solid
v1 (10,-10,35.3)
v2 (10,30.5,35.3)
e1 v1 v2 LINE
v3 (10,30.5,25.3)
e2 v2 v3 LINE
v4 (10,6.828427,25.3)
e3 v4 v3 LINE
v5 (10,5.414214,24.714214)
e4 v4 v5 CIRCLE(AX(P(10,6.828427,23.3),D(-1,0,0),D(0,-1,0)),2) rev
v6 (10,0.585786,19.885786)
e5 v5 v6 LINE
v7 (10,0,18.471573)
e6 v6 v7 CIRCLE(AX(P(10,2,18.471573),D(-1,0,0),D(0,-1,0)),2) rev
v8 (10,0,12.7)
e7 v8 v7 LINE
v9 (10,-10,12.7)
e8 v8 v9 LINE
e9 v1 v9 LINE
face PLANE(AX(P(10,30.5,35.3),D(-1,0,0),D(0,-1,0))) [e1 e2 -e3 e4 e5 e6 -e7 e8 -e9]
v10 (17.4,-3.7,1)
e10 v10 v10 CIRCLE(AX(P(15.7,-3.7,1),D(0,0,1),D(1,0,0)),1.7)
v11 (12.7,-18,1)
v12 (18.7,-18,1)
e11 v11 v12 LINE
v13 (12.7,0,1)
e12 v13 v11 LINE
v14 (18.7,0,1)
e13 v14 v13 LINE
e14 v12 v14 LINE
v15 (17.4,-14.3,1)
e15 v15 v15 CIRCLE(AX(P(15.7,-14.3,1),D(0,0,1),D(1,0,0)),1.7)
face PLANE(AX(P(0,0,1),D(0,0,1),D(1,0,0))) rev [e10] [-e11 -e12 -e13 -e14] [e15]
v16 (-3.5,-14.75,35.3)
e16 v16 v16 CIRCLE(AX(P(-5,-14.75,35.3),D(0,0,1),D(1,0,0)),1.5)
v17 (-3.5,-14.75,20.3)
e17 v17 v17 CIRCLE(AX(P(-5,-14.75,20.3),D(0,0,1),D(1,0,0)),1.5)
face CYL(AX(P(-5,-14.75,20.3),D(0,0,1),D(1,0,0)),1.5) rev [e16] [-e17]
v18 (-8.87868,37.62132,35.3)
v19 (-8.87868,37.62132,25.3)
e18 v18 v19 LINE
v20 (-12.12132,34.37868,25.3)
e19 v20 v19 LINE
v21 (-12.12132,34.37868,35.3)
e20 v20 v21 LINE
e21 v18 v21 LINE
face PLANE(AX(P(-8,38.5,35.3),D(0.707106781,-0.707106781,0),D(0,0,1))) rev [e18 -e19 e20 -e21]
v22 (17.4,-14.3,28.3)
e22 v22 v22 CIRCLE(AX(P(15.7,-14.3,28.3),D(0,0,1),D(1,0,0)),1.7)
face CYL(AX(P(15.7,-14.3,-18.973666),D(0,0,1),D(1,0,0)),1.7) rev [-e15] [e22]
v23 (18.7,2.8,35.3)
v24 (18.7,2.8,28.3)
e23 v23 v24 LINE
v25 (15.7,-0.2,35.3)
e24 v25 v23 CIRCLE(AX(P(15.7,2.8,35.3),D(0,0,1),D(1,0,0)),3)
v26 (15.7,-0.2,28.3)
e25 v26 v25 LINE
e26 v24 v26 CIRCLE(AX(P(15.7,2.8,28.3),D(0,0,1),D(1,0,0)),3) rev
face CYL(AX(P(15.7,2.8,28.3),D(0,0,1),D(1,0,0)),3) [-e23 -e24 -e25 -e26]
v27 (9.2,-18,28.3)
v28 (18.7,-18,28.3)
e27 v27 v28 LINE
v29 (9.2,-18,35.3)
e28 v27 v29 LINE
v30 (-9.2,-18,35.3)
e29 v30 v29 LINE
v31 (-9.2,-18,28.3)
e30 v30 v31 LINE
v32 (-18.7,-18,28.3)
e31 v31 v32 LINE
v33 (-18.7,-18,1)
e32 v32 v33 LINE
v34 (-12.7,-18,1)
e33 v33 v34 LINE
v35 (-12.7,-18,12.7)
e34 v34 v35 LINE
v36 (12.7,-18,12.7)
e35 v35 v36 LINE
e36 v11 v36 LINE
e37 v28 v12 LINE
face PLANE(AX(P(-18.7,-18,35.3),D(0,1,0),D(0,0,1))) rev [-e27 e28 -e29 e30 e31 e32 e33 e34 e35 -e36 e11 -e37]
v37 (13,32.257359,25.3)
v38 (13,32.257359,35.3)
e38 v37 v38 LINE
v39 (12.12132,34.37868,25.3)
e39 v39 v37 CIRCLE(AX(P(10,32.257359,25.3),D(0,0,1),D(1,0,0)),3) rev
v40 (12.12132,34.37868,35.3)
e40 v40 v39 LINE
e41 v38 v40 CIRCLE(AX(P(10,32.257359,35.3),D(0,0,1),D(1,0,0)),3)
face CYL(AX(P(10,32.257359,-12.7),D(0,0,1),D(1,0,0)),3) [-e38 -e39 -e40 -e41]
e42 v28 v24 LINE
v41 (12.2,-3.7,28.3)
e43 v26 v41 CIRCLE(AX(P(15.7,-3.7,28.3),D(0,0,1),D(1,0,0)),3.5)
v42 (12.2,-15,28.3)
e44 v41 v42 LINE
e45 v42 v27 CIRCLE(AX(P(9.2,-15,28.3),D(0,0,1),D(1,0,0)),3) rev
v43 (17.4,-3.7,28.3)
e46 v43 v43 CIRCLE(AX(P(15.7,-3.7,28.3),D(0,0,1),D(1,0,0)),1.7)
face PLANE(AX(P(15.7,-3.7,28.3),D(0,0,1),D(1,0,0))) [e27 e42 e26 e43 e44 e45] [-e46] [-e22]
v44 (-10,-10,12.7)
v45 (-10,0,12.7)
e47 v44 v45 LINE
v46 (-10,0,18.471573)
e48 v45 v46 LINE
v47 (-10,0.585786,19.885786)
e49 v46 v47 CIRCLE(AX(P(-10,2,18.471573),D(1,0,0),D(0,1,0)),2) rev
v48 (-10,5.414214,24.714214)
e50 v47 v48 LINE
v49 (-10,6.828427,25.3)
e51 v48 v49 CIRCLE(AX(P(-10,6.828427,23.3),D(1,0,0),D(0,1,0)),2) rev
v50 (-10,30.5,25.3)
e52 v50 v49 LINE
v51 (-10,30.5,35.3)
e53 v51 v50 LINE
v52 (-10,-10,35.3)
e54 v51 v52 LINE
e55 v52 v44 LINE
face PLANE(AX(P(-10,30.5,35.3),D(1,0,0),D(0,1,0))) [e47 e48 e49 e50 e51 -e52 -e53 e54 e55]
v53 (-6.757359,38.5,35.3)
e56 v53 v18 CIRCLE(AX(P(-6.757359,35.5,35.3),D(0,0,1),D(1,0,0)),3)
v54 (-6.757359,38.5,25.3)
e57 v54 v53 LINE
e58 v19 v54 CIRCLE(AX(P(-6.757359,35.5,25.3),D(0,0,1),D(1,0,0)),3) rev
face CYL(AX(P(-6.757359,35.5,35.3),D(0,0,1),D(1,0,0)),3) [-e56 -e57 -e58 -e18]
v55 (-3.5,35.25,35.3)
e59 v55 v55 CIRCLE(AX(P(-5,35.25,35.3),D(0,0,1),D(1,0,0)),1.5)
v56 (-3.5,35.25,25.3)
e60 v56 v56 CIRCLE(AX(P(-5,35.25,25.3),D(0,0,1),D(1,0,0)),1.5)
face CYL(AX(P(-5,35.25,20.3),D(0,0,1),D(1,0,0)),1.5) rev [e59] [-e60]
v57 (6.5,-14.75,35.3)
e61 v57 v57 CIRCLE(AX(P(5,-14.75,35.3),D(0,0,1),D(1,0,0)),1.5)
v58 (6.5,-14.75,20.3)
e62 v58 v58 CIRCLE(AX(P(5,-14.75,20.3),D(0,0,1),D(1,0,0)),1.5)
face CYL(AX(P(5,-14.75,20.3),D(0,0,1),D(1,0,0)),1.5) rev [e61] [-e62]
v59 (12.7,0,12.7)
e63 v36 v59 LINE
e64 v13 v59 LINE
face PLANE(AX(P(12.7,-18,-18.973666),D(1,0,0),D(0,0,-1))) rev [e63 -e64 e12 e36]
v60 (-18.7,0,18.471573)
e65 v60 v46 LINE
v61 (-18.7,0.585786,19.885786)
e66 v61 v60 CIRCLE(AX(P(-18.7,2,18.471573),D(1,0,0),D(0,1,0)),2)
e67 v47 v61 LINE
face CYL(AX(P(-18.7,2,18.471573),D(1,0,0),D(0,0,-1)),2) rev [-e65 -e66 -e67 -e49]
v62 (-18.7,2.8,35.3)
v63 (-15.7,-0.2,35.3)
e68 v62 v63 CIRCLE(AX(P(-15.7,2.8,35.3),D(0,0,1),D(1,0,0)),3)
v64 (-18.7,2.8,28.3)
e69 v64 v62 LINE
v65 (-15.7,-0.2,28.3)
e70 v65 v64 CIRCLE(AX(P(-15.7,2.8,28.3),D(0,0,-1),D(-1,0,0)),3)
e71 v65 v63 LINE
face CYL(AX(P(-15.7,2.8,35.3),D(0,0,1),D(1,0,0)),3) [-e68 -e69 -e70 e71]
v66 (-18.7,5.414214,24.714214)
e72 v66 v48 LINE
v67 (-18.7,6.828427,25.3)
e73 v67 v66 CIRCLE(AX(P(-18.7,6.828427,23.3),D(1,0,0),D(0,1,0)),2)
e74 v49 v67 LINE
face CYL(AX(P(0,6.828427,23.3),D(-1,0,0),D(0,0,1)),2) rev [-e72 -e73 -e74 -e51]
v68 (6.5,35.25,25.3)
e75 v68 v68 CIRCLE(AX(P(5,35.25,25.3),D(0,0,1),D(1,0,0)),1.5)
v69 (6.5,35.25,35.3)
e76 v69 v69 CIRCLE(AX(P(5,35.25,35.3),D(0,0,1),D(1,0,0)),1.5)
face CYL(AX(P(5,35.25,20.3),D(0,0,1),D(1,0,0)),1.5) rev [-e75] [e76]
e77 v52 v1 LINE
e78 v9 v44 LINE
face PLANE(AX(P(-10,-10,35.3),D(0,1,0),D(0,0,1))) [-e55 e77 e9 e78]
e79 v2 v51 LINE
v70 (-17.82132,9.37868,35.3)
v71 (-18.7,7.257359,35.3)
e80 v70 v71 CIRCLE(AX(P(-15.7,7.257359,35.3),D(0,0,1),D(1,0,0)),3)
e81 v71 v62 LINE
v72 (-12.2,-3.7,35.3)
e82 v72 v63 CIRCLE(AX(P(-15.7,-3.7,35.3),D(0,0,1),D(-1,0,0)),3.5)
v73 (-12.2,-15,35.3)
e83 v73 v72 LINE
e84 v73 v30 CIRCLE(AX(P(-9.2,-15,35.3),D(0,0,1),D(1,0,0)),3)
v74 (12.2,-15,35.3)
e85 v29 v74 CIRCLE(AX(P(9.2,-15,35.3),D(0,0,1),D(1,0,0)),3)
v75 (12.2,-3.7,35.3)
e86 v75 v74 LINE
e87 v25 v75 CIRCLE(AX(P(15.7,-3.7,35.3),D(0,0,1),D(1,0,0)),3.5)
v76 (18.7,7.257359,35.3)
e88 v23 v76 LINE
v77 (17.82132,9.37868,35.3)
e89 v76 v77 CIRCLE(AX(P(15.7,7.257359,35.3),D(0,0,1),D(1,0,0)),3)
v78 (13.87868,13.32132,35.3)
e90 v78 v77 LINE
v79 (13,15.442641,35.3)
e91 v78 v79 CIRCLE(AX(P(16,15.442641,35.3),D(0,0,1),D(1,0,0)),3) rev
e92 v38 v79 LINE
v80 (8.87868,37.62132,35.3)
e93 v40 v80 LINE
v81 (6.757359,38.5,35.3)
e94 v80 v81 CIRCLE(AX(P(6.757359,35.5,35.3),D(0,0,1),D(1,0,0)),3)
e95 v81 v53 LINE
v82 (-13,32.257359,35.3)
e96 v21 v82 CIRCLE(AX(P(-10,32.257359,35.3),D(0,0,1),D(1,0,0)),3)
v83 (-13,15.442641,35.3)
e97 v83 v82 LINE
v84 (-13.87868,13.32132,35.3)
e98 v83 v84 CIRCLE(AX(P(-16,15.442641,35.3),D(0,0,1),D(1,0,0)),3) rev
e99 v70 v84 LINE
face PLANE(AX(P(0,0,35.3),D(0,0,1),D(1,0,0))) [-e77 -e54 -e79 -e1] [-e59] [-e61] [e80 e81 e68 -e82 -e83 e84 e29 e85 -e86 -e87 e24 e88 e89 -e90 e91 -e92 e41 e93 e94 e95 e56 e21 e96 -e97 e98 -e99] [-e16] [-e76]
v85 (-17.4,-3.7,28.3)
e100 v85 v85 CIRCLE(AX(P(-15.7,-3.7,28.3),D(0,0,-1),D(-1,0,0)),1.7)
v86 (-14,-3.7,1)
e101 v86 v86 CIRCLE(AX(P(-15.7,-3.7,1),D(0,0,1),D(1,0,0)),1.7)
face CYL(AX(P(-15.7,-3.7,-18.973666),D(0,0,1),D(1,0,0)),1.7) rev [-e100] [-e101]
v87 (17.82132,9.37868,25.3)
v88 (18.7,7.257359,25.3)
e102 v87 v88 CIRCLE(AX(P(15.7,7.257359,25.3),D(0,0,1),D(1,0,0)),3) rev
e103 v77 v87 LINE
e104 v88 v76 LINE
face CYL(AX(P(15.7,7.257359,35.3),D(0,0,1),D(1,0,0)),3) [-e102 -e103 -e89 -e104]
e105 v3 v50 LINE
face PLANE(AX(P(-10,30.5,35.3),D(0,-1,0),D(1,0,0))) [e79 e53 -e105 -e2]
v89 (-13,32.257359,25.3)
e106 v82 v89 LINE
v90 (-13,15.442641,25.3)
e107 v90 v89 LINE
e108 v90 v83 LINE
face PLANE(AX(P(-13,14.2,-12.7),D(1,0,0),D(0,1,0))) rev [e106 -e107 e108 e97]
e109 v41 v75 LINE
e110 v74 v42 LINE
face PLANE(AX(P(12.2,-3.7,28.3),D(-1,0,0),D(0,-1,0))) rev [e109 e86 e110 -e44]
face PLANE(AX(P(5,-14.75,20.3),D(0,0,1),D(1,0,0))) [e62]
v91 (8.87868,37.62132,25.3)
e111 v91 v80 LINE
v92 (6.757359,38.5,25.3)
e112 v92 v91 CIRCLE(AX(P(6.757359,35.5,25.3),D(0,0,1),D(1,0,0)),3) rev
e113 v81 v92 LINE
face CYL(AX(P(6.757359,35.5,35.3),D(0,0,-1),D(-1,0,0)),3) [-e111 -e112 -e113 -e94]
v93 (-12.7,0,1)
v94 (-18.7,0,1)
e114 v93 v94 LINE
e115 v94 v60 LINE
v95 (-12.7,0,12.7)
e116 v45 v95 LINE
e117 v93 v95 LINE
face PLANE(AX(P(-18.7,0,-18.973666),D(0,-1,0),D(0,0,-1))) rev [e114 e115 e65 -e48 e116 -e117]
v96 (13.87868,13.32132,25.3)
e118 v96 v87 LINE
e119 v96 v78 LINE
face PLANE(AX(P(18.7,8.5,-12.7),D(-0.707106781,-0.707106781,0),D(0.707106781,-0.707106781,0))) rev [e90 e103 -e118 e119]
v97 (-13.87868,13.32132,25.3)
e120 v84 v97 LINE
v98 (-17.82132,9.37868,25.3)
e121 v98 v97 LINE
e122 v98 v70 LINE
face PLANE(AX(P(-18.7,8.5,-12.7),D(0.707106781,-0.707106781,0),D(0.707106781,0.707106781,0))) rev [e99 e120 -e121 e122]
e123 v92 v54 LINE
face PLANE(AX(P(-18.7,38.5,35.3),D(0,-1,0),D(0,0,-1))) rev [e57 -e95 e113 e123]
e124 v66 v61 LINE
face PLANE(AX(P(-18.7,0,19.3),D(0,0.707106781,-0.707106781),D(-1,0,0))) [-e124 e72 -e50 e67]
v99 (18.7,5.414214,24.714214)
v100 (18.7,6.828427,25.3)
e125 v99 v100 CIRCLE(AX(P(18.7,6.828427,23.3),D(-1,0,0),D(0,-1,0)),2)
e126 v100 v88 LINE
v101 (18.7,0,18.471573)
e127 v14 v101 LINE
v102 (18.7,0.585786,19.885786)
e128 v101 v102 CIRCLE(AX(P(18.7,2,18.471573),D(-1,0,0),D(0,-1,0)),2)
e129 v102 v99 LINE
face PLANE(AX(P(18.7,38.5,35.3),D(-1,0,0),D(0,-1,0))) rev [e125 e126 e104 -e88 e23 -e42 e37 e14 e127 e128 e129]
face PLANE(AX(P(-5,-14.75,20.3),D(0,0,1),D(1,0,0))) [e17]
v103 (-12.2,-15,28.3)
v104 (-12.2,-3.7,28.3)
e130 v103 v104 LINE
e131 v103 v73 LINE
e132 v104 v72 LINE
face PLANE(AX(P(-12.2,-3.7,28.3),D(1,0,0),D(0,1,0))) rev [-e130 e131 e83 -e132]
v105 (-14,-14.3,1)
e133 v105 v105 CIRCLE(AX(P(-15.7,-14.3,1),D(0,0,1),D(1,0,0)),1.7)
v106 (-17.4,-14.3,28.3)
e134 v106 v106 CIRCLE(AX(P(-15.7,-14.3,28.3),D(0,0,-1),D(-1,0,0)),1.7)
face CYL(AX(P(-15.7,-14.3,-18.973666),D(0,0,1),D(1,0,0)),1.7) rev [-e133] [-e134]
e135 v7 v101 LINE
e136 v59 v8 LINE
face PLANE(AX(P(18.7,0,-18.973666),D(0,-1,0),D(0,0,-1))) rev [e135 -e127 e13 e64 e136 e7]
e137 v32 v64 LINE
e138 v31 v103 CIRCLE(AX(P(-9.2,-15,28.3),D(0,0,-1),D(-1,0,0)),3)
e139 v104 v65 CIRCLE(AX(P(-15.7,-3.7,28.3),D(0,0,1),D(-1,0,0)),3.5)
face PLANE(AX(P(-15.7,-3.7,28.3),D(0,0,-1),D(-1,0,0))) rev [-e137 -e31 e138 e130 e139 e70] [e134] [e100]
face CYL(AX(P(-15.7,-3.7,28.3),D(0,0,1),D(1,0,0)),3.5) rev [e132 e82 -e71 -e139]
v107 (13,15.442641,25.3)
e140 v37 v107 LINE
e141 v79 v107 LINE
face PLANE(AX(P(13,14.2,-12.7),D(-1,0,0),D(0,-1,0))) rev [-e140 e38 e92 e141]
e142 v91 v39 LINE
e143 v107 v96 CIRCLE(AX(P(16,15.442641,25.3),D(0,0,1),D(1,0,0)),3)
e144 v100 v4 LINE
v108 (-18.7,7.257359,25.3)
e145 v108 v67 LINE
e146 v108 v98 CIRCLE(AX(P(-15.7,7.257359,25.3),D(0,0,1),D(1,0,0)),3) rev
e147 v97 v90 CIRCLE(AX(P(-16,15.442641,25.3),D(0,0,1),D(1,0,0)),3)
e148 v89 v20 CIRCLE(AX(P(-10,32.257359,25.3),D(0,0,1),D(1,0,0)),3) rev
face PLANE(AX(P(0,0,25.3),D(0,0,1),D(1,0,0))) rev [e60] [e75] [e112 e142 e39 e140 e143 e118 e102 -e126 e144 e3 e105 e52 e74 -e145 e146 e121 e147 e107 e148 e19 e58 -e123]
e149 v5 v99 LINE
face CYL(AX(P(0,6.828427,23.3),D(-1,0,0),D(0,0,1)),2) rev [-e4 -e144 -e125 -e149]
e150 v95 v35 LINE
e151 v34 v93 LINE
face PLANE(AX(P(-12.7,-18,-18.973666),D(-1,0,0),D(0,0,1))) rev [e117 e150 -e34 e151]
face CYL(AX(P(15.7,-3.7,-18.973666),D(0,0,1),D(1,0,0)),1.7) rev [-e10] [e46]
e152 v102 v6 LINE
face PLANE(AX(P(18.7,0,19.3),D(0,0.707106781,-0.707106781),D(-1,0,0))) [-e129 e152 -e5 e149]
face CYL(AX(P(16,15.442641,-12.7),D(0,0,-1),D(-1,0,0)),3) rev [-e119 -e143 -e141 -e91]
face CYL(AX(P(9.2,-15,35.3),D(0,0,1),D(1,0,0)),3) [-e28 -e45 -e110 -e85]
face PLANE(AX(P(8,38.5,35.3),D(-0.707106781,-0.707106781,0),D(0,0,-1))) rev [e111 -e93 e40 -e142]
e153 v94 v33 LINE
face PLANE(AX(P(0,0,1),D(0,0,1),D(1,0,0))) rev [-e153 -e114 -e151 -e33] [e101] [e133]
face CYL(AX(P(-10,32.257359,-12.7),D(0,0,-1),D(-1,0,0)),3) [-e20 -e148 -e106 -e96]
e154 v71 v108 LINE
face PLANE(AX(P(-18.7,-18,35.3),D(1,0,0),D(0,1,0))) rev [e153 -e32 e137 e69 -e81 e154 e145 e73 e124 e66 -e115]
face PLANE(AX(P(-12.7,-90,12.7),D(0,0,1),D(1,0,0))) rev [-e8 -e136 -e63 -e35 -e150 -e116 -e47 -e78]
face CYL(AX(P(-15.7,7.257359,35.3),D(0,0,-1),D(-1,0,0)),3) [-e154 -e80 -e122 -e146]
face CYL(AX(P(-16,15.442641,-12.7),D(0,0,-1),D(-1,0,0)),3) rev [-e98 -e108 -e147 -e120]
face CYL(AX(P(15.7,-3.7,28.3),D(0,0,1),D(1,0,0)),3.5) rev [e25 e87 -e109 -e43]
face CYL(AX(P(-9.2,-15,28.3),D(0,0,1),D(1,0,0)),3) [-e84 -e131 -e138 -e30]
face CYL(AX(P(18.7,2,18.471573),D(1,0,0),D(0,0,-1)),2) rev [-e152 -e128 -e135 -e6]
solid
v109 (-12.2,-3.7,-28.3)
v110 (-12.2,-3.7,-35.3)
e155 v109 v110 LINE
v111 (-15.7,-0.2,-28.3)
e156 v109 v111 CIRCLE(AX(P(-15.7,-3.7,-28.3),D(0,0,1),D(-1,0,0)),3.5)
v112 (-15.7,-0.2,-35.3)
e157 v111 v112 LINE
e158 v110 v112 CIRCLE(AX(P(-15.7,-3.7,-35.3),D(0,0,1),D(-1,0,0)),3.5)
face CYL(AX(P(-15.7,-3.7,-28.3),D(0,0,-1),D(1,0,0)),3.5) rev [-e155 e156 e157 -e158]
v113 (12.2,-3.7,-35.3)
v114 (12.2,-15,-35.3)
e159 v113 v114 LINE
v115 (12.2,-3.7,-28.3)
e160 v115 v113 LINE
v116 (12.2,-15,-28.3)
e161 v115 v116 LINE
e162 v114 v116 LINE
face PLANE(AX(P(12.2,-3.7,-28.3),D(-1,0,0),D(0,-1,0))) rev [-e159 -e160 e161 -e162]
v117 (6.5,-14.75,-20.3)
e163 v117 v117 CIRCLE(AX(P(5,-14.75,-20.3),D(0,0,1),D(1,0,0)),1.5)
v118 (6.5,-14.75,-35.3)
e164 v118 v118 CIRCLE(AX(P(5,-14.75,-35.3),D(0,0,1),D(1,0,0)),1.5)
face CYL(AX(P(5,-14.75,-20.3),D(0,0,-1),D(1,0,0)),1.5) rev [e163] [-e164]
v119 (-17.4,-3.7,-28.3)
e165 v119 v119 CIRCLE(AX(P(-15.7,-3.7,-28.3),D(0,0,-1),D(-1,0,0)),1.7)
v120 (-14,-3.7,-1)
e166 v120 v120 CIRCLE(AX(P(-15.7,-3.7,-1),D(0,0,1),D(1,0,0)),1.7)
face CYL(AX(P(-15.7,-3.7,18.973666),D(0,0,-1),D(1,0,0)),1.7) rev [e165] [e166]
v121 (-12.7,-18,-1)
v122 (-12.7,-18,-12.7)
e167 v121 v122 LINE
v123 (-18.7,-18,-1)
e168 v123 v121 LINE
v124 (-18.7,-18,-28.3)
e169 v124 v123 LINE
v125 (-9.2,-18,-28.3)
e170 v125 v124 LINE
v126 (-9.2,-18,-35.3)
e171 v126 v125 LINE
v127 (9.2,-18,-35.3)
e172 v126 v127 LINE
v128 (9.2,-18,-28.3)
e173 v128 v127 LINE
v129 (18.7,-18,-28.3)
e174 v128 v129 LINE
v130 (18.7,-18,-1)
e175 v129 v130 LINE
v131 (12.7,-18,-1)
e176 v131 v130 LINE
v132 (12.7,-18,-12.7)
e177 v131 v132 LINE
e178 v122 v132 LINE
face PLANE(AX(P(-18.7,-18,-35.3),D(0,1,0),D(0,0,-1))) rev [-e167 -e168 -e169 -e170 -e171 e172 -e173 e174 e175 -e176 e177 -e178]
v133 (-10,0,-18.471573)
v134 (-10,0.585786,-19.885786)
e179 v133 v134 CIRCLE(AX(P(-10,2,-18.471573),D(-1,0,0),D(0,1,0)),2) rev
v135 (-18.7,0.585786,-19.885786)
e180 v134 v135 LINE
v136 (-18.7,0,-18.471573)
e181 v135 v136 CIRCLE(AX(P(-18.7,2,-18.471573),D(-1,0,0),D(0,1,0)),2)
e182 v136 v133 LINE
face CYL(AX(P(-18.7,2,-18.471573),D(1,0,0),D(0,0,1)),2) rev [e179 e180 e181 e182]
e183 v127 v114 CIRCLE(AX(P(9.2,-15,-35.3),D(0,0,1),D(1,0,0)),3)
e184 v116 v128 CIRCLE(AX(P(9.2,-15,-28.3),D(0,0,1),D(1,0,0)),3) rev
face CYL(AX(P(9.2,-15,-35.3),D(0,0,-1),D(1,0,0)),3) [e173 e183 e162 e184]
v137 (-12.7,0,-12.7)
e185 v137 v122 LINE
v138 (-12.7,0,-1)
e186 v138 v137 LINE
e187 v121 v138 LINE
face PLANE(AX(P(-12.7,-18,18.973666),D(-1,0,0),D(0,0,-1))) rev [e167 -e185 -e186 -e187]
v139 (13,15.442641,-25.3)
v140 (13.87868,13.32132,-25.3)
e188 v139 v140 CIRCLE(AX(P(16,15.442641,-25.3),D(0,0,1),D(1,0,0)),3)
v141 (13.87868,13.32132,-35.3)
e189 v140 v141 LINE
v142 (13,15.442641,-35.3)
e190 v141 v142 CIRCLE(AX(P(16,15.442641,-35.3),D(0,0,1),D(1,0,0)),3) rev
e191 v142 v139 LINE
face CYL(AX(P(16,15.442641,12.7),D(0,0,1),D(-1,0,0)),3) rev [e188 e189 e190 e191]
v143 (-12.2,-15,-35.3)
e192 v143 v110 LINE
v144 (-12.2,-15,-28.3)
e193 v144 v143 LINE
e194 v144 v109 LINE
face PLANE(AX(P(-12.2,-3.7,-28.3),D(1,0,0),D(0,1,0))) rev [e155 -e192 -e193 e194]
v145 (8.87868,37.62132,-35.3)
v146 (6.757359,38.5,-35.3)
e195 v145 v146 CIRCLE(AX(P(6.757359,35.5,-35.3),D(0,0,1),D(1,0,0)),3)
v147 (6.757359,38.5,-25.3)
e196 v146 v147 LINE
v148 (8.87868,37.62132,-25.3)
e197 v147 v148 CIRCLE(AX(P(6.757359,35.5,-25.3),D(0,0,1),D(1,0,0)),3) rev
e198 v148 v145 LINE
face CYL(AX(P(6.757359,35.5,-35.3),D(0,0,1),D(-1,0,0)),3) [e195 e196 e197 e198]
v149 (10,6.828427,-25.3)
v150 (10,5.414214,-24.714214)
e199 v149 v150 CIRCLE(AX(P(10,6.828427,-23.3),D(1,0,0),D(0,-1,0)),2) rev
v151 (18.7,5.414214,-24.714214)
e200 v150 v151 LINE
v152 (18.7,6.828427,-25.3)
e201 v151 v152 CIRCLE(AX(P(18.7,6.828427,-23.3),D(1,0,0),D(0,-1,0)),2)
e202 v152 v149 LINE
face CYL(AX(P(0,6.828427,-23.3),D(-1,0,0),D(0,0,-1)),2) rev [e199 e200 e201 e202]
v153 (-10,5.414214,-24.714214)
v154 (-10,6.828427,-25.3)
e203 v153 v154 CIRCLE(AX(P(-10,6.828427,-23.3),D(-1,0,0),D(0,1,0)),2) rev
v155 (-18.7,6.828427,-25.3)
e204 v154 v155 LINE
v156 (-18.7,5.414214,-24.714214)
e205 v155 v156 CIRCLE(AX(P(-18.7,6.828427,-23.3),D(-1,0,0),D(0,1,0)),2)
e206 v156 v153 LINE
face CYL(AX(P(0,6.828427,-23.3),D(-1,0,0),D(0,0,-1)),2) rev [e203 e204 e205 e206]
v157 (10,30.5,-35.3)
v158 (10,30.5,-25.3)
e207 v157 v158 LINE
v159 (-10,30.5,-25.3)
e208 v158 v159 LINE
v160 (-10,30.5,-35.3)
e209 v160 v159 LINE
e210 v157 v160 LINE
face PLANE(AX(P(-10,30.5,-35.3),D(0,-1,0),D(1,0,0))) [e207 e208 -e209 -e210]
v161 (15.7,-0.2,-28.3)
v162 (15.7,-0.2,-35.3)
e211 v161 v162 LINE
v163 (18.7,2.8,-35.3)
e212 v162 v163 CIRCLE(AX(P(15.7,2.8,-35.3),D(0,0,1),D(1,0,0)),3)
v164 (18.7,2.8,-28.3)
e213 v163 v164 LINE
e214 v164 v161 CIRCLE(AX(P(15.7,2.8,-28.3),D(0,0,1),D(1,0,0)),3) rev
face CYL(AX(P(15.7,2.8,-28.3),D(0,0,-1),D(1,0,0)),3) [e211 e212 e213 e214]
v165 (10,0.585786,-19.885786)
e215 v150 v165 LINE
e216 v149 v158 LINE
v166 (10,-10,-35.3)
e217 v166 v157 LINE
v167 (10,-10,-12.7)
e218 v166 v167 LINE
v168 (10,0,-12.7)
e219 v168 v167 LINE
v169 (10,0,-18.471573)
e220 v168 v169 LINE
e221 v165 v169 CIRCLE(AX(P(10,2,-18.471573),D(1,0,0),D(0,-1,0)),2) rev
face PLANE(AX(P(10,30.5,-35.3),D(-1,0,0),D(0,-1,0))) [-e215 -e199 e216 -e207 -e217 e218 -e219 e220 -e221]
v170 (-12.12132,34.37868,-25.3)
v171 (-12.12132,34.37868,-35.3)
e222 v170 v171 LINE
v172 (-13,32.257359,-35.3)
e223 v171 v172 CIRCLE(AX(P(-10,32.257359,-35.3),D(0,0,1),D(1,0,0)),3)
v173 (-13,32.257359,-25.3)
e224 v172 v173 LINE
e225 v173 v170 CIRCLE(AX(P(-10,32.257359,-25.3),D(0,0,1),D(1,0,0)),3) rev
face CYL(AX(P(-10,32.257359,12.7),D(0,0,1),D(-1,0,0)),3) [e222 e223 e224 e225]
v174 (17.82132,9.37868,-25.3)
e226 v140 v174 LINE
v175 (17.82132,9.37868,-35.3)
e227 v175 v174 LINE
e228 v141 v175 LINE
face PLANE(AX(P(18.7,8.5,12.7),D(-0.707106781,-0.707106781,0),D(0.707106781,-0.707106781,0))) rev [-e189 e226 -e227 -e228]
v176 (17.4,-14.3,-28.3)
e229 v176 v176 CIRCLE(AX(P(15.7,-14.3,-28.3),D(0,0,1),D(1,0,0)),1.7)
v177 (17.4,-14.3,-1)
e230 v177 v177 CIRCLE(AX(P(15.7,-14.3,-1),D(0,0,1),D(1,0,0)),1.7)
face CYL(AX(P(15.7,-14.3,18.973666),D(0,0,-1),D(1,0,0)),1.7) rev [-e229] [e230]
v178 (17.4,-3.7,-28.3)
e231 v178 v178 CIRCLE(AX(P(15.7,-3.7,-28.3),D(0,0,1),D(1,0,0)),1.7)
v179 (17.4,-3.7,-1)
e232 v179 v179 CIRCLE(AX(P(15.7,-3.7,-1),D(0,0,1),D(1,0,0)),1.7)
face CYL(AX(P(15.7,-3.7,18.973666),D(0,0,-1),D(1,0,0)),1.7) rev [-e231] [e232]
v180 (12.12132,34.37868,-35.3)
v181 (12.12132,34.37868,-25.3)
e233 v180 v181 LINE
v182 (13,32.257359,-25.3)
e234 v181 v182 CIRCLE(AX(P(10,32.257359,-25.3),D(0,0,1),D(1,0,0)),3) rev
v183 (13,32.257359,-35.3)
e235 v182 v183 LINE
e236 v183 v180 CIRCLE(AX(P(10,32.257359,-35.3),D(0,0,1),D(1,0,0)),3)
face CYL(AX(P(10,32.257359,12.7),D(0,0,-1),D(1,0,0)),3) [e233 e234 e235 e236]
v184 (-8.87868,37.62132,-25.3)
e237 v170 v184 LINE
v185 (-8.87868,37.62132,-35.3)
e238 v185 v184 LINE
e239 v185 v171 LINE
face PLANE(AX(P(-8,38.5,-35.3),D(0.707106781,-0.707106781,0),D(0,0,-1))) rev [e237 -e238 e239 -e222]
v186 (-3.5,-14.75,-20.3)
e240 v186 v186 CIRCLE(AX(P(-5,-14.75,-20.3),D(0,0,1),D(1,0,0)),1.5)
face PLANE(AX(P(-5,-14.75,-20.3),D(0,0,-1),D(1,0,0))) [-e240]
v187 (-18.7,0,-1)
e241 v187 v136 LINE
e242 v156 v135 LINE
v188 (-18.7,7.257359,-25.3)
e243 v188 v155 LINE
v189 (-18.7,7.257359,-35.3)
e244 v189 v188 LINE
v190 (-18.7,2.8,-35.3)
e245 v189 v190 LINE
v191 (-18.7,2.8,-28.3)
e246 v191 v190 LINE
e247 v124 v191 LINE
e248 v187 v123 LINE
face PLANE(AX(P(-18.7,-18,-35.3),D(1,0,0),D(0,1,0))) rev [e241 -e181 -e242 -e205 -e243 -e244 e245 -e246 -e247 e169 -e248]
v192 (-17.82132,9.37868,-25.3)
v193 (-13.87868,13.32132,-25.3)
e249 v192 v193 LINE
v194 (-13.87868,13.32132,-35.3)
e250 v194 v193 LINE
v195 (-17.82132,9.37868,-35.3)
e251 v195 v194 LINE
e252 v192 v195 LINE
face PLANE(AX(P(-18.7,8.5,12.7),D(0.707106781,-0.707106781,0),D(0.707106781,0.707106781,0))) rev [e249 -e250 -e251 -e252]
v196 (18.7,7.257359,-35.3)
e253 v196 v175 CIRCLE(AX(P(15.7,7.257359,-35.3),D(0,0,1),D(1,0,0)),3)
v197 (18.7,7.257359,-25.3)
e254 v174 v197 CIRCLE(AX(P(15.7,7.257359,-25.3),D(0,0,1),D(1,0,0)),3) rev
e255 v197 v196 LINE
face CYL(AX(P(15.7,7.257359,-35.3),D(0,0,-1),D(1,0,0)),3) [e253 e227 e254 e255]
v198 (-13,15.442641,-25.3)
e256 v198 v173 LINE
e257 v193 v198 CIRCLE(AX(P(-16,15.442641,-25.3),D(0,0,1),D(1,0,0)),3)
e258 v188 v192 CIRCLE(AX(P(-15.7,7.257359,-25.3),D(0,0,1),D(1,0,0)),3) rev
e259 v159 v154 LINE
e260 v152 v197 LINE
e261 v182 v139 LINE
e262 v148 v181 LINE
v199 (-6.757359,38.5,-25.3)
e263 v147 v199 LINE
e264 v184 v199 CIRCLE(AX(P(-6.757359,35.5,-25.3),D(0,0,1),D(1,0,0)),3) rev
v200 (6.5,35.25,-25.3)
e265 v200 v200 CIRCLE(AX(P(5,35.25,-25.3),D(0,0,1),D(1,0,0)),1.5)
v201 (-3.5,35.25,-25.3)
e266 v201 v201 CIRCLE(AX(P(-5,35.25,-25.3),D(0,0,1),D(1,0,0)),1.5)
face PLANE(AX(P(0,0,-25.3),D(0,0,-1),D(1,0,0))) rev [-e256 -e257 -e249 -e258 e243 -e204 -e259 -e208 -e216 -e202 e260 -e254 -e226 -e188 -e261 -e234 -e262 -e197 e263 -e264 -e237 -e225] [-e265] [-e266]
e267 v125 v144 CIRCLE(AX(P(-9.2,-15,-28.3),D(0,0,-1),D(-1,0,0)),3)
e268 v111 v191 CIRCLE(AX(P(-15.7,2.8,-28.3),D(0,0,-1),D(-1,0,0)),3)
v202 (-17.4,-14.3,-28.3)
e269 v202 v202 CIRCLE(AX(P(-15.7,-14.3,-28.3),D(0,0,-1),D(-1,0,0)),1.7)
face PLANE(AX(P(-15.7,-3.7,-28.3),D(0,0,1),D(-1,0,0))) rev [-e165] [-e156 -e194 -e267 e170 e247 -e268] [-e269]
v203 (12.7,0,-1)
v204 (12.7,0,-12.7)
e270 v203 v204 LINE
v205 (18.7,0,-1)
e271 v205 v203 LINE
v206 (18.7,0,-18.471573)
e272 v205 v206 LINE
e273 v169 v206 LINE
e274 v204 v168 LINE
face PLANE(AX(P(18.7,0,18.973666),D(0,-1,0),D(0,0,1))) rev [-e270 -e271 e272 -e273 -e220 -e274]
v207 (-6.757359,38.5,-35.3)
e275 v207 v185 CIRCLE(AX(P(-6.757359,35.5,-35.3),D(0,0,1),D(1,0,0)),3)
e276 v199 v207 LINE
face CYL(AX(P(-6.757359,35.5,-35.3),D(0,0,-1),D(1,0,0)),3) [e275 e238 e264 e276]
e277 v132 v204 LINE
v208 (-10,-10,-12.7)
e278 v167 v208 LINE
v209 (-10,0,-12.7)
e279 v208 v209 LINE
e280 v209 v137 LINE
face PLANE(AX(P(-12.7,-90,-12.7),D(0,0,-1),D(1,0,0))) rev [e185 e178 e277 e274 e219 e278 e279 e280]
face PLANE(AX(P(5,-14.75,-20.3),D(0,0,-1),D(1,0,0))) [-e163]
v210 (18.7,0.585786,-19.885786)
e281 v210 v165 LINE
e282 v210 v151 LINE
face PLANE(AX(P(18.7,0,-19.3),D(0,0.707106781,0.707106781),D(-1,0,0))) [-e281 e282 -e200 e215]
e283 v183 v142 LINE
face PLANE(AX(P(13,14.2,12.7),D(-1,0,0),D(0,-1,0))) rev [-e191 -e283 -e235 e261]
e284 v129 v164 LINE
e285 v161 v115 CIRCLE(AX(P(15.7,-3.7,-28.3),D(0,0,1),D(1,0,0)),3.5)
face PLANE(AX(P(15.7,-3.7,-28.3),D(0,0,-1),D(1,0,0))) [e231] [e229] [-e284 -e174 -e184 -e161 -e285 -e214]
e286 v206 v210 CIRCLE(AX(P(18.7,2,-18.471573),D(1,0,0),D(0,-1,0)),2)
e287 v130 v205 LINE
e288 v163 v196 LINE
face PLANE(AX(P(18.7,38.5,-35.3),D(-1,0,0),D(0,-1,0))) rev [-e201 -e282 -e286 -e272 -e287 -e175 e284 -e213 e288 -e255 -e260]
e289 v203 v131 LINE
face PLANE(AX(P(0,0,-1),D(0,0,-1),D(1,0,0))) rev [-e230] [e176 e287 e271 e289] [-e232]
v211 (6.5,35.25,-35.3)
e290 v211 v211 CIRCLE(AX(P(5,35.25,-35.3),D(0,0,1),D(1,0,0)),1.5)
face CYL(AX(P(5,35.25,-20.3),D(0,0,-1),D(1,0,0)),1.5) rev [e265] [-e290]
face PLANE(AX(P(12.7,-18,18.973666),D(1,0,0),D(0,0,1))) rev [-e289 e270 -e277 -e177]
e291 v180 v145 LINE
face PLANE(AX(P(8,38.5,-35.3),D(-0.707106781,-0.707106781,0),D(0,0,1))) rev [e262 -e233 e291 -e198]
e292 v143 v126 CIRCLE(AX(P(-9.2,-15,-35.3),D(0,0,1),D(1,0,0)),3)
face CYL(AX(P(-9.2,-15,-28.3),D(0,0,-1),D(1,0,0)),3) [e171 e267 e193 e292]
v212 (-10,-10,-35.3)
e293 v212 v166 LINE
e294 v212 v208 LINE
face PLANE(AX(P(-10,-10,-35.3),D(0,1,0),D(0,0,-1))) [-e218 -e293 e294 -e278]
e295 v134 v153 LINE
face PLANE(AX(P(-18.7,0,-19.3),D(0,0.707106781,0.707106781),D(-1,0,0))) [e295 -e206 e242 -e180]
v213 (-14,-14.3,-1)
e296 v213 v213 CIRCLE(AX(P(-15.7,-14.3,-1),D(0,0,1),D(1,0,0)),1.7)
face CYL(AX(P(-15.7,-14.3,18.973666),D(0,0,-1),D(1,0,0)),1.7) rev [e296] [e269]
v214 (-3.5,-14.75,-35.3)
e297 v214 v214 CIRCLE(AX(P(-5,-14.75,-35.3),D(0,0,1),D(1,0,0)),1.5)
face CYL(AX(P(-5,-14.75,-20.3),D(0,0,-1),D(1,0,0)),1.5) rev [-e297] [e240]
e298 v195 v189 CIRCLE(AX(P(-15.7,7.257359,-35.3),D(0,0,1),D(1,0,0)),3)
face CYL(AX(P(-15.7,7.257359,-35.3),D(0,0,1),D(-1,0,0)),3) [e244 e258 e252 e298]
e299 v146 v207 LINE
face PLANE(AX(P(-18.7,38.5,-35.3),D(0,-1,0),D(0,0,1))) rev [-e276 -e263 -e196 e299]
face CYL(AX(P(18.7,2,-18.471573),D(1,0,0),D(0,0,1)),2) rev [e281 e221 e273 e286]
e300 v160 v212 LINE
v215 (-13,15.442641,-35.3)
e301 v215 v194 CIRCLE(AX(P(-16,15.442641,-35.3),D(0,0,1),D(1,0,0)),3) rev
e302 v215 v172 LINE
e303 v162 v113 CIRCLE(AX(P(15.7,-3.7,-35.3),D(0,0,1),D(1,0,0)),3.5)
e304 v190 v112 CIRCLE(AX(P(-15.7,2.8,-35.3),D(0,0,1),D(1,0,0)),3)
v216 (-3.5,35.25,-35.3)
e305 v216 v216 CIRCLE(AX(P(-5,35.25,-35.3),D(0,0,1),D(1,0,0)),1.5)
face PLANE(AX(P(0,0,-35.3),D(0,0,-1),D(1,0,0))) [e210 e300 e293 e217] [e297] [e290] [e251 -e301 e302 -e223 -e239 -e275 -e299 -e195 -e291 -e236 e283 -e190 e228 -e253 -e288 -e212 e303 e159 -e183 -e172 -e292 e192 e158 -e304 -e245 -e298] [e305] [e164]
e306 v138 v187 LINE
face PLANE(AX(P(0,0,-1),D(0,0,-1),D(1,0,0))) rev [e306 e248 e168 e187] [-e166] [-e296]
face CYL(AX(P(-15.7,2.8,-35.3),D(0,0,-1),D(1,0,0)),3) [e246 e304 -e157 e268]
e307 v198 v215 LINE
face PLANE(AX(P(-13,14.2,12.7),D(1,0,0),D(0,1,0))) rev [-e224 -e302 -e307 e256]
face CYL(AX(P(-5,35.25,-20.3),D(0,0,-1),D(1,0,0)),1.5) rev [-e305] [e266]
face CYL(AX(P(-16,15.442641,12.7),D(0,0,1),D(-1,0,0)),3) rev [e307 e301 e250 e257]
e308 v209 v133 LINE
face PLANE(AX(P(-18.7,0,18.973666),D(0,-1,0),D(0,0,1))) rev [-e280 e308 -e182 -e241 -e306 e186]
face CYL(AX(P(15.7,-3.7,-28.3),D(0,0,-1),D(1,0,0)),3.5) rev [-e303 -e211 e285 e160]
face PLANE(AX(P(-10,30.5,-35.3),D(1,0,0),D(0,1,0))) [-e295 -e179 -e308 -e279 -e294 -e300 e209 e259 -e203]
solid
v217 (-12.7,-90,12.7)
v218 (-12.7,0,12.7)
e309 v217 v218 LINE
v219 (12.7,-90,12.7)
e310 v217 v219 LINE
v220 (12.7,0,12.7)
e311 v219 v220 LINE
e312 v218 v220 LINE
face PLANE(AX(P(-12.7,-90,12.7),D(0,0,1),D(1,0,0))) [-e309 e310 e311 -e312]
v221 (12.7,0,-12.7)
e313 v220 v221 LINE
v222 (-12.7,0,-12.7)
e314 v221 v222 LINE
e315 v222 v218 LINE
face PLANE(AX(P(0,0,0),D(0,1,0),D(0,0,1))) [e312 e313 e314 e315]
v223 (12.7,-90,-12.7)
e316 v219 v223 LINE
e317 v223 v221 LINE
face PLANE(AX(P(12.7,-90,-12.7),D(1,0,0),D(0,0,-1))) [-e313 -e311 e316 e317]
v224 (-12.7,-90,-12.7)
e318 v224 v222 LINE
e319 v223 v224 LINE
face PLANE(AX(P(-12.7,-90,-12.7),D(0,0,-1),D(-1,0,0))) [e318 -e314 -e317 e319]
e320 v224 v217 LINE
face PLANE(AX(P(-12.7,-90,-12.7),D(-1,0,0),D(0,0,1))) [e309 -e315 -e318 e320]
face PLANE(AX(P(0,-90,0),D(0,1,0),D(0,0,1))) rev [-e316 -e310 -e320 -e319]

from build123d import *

# Parameters (mm, degrees)
SKETCH1_W           = 25.4
SKETCH1_H           = 25.4
BOSS_EXTRUDE1_DEPTH = 90
BOSS_EXTRUDE2_START = 25.3
SKETCH2_W           = 37.4
SKETCH2_H           = 56.5
SKETCH2_W_2         = 20
SKETCH2_H_2         = 40.5
BOSS_EXTRUDE2_DEPTH = 10
SKETCH3_W           = 6
SKETCH3_H           = 18
SKETCH3_R           = 1.7
BOSS_EXTRUDE3_DEPTH = 24.3
BOSS_EXTRUDE4_DEPTH = 12.6
SKETCH3_2_R         = 1.7
CUT_EXTRUDE1_DEPTH  = 100.467029713
CUT_EXTRUDE2_DEPTH  = 104.7
CHAMFER3_SIZE       = 5
FILLET4_R           = 3
CUT_EXTRUDE3_DEPTH  = 7
SKETCH10_R          = 1.5
CUT_EXTRUDE4_DEPTH  = 15
CHAMFER2_SIZE       = 6
FILLET2_R           = 2
FILLET3_R           = 3


with BuildPart() as part:
    # Sketch1 → Boss-Extrude1 (new body)
    with BuildSketch(Plane(origin=(0, 0, 0), x_dir=(1, 0, 0), z_dir=(0, 1, 0))):
        Rectangle(SKETCH1_W, SKETCH1_H)
    extrude(amount=-BOSS_EXTRUDE1_DEPTH)


with BuildPart() as body_2:
    # Sketch2 → Boss-Extrude2 (new body)
    with BuildSketch(Plane.XY.offset(BOSS_EXTRUDE2_START)):
        with Locations((0, 10.25)):
            Rectangle(SKETCH2_W, SKETCH2_H)
        with Locations((0, 10.25)):
            Rectangle(SKETCH2_W_2, SKETCH2_H_2, mode=Mode.SUBTRACT)
    extrude(amount=BOSS_EXTRUDE2_DEPTH)

    # Sketch3 → Boss-Extrude3 (add)
    # profile 1 of 2: a face of its own
    with BuildSketch(Plane(origin=(0, 0, 25.3), x_dir=(-1, 0, 0), z_dir=(0, 0, -1))):
        with Locations((-15.7, -9)):
            Rectangle(SKETCH3_W, SKETCH3_H)
        with Locations(Location((-15.7, -14.3, 0), (0, 0, 180))):
            Circle(SKETCH3_R, mode=Mode.SUBTRACT)
        with Locations(Location((-15.7, -3.7, 0), (0, 0, 180))):
            Circle(SKETCH3_R, mode=Mode.SUBTRACT)
    # profile 2 of 2: a face of its own
    with BuildSketch(Plane(origin=(0, 0, 25.3), x_dir=(-1, 0, 0), z_dir=(0, 0, -1))):
        with Locations((15.7, -9)):
            Rectangle(SKETCH3_W, SKETCH3_H)
        with Locations(Location((15.7, -3.7, 0), (0, 0, 180))):
            Circle(SKETCH3_R, mode=Mode.SUBTRACT)
        with Locations(Location((15.7, -14.3, 0), (0, 0, 180))):
            Circle(SKETCH3_R, mode=Mode.SUBTRACT)
    extrude(amount=BOSS_EXTRUDE3_DEPTH)

    # Sketch6 → Boss-Extrude4 (add)
    with BuildSketch(Plane(origin=(0, 0, 25.3), x_dir=(-1, 0, 0), z_dir=(0, 0, -1))):
        Polygon((-12.7, -18), (-12.7, 0), (-10, 0), (-10, -10), (10, -10), (10, 0), (12.7, 0), (12.7, -18), align=None)
    extrude(amount=BOSS_EXTRUDE4_DEPTH)

    # Sketch3<2> → Cut-Extrude1 (cut, through all)
    with BuildSketch(Plane(origin=(0, 0, 25.3), x_dir=(-1, 0, 0), z_dir=(0, 0, -1))):
        with Locations(Location((15.7, -3.7, 0), (0, 0, 180))):
            Circle(SKETCH3_2_R)
        with Locations(Location((15.7, -14.3, 0), (0, 0, 180))):
            Circle(SKETCH3_2_R)
        with Locations(Location((-15.7, -14.3, 0), (0, 0, 180))):
            Circle(SKETCH3_2_R)
        with Locations(Location((-15.7, -3.7, 0), (0, 0, 180))):
            Circle(SKETCH3_2_R)
    extrude(amount=-CUT_EXTRUDE1_DEPTH, mode=Mode.SUBTRACT)

    # Sketch7 → Cut-Extrude2 (cut, through all)
    with BuildSketch(Plane.XY.offset(35.3)):
        Polygon((-18.7, 8.5), (-13, 14.2), (-13, 38.5), (-18.7, 38.5), align=None)
        Polygon((13, 38.5), (18.7, 38.5), (18.7, 8.5), (13, 14.2), align=None)
    extrude(amount=-CUT_EXTRUDE2_DEPTH, mode=Mode.SUBTRACT)

    # Chamfer3
    chamfer3_edges = [body_2.edges().sort_by_distance(p)[0] for p in [
        (13, 38.5, 30.3),
        (-13, 38.5, 30.3),
    ]]
    chamfer(chamfer3_edges, length=CHAMFER3_SIZE)

    # Fillet4
    fillet4_edges = [body_2.edges().sort_by_distance(p)[0] for p in [
        (-8, 38.5, 30.3),
        (8, 38.5, 30.3),
        (13, 33.5, 30.3),
        (-13, 33.5, 30.3),
    ]]
    fillet(fillet4_edges, radius=FILLET4_R)

    # Sketch8 → Cut-Extrude3 (cut)
    with BuildSketch(Plane.XY.offset(35.3)):
        with BuildLine():
            Line((15.7, -0.2), (18.7, -0.2))
            Line((18.7, -0.2), (31.607326966, -25.992103599))
            Line((31.607326966, -25.992103599), (12.2, -18))
            Line((12.2, -18), (12.2, -3.7))
            ThreePointArc((12.2, -3.7), (13.225126266, -1.225126266), (15.7, -0.2))
        make_face()
        with BuildLine():
            Line((-12.2, -3.7), (-12.2, -18))
            Line((-12.2, -18), (-31.607326966, -25.992103599))
            Line((-31.607326966, -25.992103599), (-18.7, -0.2))
            Line((-18.7, -0.2), (-15.7, -0.2))
            ThreePointArc((-15.7, -0.2), (-13.225126266, -1.225126266), (-12.2, -3.7))
        make_face()
    extrude(amount=-CUT_EXTRUDE3_DEPTH, mode=Mode.SUBTRACT)

    # Sketch10 → Cut-Extrude4 (cut)
    with BuildSketch(Plane.XY.offset(35.3)):
        with Locations((-5, 35.25)):
            Circle(SKETCH10_R)
        with Locations((5, 35.25)):
            Circle(SKETCH10_R)
        with Locations((-5, -14.75)):
            Circle(SKETCH10_R)
        with Locations((5, -14.75)):
            Circle(SKETCH10_R)
    extrude(amount=-CUT_EXTRUDE4_DEPTH, mode=Mode.SUBTRACT)

    # Chamfer2
    chamfer2_edges = [body_2.edges().sort_by_distance(p)[0] for p in [
        (14.35, 0, 25.3),
        (-14.35, 0, 25.3),
    ]]
    chamfer(chamfer2_edges, length=CHAMFER2_SIZE)

    # Fillet2
    fillet2_edges = [body_2.edges().sort_by_distance(p)[0] for p in [
        (-14.35, 0, 19.3),
        (14.35, 6, 25.3),
        (-14.35, 6, 25.3),
        (14.35, 0, 19.3),
    ]]
    fillet(fillet2_edges, radius=FILLET2_R)

    # Fillet3
    fillet3_edges = [body_2.edges().sort_by_distance(p)[0] for p in [
        (-13, 14.2, 30.3),
        (-18.7, 8.5, 30.3),
        (-18.7, -0.2, 31.8),
        (-12.2, -18, 31.8),
        (12.2, -18, 31.8),
        (18.7, -0.2, 31.8),
        (18.7, 8.5, 30.3),
        (13, 14.2, 30.3),
    ]]
    fillet(fillet3_edges, radius=FILLET3_R - 0.0001)  # a hair under: the kernel refuses the full size


with BuildPart() as body_3:
    # Mirror1: mirrored copy
    add(body_2.part.mirror(Plane.XY))


solid = Compound([part.part, body_2.part, body_3.part])
